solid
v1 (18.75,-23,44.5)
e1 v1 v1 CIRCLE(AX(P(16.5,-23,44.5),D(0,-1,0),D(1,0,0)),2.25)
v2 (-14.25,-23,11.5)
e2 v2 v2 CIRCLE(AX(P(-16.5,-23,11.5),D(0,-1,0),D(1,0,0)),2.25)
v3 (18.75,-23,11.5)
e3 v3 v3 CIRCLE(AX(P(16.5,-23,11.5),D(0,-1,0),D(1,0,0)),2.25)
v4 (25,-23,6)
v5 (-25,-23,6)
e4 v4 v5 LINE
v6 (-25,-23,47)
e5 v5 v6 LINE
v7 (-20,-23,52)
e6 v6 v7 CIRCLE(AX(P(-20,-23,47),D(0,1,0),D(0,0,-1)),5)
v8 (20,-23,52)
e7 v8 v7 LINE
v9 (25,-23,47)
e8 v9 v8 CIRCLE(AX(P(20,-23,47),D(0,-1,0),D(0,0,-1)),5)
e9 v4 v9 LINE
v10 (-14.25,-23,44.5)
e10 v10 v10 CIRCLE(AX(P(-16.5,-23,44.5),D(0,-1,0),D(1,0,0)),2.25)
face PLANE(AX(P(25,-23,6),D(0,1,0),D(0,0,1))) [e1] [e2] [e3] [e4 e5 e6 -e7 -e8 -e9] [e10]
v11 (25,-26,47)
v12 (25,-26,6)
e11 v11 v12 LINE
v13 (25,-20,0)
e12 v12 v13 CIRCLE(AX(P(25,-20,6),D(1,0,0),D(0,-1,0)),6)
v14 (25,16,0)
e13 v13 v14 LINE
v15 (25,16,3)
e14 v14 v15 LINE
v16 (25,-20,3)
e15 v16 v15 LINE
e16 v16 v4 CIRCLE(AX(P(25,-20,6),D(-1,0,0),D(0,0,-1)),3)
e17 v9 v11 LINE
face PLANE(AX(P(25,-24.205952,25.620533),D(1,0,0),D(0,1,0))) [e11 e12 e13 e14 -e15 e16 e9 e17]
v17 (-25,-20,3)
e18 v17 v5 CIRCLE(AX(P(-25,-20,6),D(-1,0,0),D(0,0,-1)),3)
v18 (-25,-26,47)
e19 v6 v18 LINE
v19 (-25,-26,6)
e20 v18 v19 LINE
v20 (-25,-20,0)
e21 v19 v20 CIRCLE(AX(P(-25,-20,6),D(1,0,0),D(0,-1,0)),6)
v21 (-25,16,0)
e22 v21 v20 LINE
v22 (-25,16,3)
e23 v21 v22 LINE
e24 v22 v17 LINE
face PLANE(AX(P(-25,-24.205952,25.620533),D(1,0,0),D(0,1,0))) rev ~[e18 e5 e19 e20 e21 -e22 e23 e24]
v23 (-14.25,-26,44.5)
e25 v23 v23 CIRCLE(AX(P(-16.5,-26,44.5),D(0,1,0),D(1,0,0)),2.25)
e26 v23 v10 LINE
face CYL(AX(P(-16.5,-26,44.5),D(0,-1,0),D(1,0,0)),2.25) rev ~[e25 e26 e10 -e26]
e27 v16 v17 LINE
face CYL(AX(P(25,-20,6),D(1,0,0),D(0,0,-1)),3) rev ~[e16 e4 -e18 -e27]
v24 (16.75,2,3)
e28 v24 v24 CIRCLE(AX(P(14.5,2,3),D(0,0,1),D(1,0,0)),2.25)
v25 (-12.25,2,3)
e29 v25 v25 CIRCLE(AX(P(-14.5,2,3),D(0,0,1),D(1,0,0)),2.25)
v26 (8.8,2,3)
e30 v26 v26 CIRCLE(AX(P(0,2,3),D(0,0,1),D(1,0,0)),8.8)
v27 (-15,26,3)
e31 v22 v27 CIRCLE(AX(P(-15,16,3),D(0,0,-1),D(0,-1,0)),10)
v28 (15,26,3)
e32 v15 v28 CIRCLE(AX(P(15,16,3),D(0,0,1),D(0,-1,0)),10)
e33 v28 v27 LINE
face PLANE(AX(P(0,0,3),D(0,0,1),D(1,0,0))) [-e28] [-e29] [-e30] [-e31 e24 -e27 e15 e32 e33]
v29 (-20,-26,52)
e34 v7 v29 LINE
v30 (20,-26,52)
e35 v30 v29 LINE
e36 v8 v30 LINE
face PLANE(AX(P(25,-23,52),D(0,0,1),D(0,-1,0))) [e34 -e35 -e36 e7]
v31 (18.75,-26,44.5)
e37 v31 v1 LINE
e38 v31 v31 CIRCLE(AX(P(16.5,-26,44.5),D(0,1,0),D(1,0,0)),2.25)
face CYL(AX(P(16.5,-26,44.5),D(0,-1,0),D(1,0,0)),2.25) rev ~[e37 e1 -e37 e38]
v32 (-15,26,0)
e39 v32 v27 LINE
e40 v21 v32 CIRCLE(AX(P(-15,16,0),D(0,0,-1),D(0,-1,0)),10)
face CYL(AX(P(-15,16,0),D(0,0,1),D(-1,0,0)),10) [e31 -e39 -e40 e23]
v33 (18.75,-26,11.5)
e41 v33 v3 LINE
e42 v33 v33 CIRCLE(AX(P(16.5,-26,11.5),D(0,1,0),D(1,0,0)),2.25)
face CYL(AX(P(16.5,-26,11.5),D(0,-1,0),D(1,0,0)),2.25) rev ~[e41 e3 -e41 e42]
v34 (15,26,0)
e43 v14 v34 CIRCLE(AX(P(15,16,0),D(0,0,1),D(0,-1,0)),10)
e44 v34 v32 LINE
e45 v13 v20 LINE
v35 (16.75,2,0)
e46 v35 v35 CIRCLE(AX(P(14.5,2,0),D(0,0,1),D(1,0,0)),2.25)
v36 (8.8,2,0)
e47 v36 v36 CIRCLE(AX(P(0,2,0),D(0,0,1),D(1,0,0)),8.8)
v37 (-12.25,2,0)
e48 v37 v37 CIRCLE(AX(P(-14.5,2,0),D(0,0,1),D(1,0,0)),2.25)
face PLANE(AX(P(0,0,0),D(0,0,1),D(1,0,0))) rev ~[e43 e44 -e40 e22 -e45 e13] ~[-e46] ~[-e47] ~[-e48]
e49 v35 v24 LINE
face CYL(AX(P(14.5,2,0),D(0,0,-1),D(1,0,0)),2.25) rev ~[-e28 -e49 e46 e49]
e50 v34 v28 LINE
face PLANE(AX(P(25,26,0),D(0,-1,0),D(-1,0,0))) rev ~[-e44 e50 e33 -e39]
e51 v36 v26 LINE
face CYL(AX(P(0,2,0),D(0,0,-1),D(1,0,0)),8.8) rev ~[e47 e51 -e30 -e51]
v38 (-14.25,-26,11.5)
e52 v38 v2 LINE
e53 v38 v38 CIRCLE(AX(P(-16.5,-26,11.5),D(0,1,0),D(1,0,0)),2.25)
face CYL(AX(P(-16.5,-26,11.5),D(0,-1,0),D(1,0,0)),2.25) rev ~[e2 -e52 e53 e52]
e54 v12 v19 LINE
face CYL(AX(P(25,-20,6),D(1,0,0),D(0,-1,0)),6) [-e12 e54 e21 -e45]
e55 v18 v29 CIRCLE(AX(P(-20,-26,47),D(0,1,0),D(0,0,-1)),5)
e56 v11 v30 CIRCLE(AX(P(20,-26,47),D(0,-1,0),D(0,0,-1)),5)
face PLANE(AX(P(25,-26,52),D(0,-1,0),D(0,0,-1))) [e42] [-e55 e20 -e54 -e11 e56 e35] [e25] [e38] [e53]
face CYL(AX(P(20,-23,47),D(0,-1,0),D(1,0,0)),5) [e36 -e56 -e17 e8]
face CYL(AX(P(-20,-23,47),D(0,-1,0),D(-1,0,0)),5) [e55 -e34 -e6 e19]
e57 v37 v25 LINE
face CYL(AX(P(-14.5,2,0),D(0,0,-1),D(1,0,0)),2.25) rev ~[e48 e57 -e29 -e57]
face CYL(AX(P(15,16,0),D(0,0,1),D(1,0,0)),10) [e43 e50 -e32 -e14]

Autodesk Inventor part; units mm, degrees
ref_plane "YZ Plane" through (0, 0, 0) normal (1, 0, 0) x (0, 1, 0)
ref_plane "XZ Plane" through (0, 0, 0) normal (0, 1, 0) x (-1, 0, 0)
ref_plane "XY Plane" through (0, 0, 0) normal (0, 0, 1) x (1, 0, 0)
sketch "Sketch1" plane through (0, 0, 0) normal (0, 0, 1) x (1, 0, 0)
  line L0 (-25, -26) -> (25, -26)
  line L1 (25, -26) -> (25, 26)
  line L2 (25, 26) -> (-25, 26)
  line L3 (-25, 26) -> (-25, -26)
  line L4 (-25, -26) -> (25, 26) construction
  line L5 (25, -26) -> (-25, 26) construction
  circle A0 centre (0, 2) radius 8.8
  circle A1 centre (-14.5, 2) radius 2.25
  circle A2 centre (14.5, 2) radius 2.25
  point P0 (0, 0)
  dimension "d0" = 50
  dimension "d1" = 52
  dimension "d2" = 17.6
  dimension "d3" = 24
  dimension "d4" = 4.5
  dimension "d5" = 4.5
  dimension "d6" = 29
  dimension "d7" = 14.5
  dimension "d8" = 24
  dimension "d9" = 24
  dimension "d10" = 25
extrude "Plate1" add sketch "Sketch1" along normal blind 3
sketch "Sketch2" plane through (25, -23, 0) normal (0, -1, 0) x (1, 0, 0)
  line L0 (-50, 0) -> (0, 0)
  line L1 (0, 0) -> (0, 52)
  line L2 (0, 52) -> (-50, 52)
  line L3 (-50, 52) -> (-50, 0)
edge flange "Flange1" height 52 angle 90 thickness 3 bend radius 3 thickness toward (0, -1, 0) relief tear relief width 3 relief depth 1.5 edges at (0, -26, 3) wall of the first edge with corners at (-25, -23, 0) (25, -23, 0) (25, -23, 52) (-25, -23, 52)
bend "Bend1"
corner "Corner1"
fillet "Fillet1" radius 10 2 edges at (25, 26, 1.5) (-25, 26, 1.5)
fillet "Fillet2" radius 5 2 edges at (-25, -24.5, 52) (25, -24.5, 52)
sketch "Sketch3" plane through (-25, -26, 6) normal (0, -1, 0) x (1, 0, 0)
  line L0 (8.5, 38.5) -> (41.5, 38.5)
  line L1 (41.5, 38.5) -> (41.5, 5.5)
  line L2 (41.5, 5.5) -> (8.5, 5.5)
  line L3 (8.5, 5.5) -> (8.5, 38.5)
  line L4 (8.5, 38.5) -> (41.5, 5.5) construction
  line L5 (41.5, 38.5) -> (8.5, 5.5) construction
  line L6 (5, 46) -> (45, 46) projected
  line L7 (50, 41) -> (50, 0) projected
  circle A0 centre (41.5, 38.5) radius 2.25
  circle A1 centre (41.5, 5.5) radius 2.25
  circle A2 centre (8.5, 38.5) radius 2.25
  circle A3 centre (8.5, 5.5) radius 2.25
  point P0 (25, -6)
  point P1 (25, 22)
  dimension "d24" = 33
  dimension "d25" = 33
  dimension "d26" = 24
  dimension "d27" = 25
  dimension "d28" = 4.5
  dimension "d29" = 4.5
  dimension "d30" = 4.5
  dimension "d31" = 4.5
extrude "Cut1" cut sketch "Sketch3" against normal blind 3 contours L3 A2 L0 | L0 A2 L3 | A0 L1 L0 | L0 L1 A0 | A3 L2 L3 | L3 L2 A3 | A1 L2 L1 | L1 L2 A1
equation "\"d32\" = Thickness"
equation "\"d11\" = Thickness"
equation "\"d12\" = BendReliefWidth"
equation "\"d13\" = BendReliefDepth"
equation "\"d14\" = MinimumRemnant"
equation "\"d15\" = TransitionRadius"
equation "\"d18\" = BendRadius"
equation "\"d19\" = CornerReliefSize"
equation "\"d20\" = GapSize"
equation "\"d21\" = JacobiRadiusSize"
equation "\"BendRadius\" = Thickness"
equation "\"BendReliefWidth\" = Thickness"
equation "\"BendReliefDepth\" = 0.5 * Thickness"
equation "\"CornerReliefSize\" = 4 * Thickness"
equation "\"MinimumRemnant\" = 2 * Thickness"
equation "\"TransitionRadius\" = BendRadius"
equation "\"JacobiRadiusSize\" = BendRadius"
equation "\"GapSize\" = Thickness"
equation "\"Thickness\" = 3"
properties part number "Pad dong co 775"
